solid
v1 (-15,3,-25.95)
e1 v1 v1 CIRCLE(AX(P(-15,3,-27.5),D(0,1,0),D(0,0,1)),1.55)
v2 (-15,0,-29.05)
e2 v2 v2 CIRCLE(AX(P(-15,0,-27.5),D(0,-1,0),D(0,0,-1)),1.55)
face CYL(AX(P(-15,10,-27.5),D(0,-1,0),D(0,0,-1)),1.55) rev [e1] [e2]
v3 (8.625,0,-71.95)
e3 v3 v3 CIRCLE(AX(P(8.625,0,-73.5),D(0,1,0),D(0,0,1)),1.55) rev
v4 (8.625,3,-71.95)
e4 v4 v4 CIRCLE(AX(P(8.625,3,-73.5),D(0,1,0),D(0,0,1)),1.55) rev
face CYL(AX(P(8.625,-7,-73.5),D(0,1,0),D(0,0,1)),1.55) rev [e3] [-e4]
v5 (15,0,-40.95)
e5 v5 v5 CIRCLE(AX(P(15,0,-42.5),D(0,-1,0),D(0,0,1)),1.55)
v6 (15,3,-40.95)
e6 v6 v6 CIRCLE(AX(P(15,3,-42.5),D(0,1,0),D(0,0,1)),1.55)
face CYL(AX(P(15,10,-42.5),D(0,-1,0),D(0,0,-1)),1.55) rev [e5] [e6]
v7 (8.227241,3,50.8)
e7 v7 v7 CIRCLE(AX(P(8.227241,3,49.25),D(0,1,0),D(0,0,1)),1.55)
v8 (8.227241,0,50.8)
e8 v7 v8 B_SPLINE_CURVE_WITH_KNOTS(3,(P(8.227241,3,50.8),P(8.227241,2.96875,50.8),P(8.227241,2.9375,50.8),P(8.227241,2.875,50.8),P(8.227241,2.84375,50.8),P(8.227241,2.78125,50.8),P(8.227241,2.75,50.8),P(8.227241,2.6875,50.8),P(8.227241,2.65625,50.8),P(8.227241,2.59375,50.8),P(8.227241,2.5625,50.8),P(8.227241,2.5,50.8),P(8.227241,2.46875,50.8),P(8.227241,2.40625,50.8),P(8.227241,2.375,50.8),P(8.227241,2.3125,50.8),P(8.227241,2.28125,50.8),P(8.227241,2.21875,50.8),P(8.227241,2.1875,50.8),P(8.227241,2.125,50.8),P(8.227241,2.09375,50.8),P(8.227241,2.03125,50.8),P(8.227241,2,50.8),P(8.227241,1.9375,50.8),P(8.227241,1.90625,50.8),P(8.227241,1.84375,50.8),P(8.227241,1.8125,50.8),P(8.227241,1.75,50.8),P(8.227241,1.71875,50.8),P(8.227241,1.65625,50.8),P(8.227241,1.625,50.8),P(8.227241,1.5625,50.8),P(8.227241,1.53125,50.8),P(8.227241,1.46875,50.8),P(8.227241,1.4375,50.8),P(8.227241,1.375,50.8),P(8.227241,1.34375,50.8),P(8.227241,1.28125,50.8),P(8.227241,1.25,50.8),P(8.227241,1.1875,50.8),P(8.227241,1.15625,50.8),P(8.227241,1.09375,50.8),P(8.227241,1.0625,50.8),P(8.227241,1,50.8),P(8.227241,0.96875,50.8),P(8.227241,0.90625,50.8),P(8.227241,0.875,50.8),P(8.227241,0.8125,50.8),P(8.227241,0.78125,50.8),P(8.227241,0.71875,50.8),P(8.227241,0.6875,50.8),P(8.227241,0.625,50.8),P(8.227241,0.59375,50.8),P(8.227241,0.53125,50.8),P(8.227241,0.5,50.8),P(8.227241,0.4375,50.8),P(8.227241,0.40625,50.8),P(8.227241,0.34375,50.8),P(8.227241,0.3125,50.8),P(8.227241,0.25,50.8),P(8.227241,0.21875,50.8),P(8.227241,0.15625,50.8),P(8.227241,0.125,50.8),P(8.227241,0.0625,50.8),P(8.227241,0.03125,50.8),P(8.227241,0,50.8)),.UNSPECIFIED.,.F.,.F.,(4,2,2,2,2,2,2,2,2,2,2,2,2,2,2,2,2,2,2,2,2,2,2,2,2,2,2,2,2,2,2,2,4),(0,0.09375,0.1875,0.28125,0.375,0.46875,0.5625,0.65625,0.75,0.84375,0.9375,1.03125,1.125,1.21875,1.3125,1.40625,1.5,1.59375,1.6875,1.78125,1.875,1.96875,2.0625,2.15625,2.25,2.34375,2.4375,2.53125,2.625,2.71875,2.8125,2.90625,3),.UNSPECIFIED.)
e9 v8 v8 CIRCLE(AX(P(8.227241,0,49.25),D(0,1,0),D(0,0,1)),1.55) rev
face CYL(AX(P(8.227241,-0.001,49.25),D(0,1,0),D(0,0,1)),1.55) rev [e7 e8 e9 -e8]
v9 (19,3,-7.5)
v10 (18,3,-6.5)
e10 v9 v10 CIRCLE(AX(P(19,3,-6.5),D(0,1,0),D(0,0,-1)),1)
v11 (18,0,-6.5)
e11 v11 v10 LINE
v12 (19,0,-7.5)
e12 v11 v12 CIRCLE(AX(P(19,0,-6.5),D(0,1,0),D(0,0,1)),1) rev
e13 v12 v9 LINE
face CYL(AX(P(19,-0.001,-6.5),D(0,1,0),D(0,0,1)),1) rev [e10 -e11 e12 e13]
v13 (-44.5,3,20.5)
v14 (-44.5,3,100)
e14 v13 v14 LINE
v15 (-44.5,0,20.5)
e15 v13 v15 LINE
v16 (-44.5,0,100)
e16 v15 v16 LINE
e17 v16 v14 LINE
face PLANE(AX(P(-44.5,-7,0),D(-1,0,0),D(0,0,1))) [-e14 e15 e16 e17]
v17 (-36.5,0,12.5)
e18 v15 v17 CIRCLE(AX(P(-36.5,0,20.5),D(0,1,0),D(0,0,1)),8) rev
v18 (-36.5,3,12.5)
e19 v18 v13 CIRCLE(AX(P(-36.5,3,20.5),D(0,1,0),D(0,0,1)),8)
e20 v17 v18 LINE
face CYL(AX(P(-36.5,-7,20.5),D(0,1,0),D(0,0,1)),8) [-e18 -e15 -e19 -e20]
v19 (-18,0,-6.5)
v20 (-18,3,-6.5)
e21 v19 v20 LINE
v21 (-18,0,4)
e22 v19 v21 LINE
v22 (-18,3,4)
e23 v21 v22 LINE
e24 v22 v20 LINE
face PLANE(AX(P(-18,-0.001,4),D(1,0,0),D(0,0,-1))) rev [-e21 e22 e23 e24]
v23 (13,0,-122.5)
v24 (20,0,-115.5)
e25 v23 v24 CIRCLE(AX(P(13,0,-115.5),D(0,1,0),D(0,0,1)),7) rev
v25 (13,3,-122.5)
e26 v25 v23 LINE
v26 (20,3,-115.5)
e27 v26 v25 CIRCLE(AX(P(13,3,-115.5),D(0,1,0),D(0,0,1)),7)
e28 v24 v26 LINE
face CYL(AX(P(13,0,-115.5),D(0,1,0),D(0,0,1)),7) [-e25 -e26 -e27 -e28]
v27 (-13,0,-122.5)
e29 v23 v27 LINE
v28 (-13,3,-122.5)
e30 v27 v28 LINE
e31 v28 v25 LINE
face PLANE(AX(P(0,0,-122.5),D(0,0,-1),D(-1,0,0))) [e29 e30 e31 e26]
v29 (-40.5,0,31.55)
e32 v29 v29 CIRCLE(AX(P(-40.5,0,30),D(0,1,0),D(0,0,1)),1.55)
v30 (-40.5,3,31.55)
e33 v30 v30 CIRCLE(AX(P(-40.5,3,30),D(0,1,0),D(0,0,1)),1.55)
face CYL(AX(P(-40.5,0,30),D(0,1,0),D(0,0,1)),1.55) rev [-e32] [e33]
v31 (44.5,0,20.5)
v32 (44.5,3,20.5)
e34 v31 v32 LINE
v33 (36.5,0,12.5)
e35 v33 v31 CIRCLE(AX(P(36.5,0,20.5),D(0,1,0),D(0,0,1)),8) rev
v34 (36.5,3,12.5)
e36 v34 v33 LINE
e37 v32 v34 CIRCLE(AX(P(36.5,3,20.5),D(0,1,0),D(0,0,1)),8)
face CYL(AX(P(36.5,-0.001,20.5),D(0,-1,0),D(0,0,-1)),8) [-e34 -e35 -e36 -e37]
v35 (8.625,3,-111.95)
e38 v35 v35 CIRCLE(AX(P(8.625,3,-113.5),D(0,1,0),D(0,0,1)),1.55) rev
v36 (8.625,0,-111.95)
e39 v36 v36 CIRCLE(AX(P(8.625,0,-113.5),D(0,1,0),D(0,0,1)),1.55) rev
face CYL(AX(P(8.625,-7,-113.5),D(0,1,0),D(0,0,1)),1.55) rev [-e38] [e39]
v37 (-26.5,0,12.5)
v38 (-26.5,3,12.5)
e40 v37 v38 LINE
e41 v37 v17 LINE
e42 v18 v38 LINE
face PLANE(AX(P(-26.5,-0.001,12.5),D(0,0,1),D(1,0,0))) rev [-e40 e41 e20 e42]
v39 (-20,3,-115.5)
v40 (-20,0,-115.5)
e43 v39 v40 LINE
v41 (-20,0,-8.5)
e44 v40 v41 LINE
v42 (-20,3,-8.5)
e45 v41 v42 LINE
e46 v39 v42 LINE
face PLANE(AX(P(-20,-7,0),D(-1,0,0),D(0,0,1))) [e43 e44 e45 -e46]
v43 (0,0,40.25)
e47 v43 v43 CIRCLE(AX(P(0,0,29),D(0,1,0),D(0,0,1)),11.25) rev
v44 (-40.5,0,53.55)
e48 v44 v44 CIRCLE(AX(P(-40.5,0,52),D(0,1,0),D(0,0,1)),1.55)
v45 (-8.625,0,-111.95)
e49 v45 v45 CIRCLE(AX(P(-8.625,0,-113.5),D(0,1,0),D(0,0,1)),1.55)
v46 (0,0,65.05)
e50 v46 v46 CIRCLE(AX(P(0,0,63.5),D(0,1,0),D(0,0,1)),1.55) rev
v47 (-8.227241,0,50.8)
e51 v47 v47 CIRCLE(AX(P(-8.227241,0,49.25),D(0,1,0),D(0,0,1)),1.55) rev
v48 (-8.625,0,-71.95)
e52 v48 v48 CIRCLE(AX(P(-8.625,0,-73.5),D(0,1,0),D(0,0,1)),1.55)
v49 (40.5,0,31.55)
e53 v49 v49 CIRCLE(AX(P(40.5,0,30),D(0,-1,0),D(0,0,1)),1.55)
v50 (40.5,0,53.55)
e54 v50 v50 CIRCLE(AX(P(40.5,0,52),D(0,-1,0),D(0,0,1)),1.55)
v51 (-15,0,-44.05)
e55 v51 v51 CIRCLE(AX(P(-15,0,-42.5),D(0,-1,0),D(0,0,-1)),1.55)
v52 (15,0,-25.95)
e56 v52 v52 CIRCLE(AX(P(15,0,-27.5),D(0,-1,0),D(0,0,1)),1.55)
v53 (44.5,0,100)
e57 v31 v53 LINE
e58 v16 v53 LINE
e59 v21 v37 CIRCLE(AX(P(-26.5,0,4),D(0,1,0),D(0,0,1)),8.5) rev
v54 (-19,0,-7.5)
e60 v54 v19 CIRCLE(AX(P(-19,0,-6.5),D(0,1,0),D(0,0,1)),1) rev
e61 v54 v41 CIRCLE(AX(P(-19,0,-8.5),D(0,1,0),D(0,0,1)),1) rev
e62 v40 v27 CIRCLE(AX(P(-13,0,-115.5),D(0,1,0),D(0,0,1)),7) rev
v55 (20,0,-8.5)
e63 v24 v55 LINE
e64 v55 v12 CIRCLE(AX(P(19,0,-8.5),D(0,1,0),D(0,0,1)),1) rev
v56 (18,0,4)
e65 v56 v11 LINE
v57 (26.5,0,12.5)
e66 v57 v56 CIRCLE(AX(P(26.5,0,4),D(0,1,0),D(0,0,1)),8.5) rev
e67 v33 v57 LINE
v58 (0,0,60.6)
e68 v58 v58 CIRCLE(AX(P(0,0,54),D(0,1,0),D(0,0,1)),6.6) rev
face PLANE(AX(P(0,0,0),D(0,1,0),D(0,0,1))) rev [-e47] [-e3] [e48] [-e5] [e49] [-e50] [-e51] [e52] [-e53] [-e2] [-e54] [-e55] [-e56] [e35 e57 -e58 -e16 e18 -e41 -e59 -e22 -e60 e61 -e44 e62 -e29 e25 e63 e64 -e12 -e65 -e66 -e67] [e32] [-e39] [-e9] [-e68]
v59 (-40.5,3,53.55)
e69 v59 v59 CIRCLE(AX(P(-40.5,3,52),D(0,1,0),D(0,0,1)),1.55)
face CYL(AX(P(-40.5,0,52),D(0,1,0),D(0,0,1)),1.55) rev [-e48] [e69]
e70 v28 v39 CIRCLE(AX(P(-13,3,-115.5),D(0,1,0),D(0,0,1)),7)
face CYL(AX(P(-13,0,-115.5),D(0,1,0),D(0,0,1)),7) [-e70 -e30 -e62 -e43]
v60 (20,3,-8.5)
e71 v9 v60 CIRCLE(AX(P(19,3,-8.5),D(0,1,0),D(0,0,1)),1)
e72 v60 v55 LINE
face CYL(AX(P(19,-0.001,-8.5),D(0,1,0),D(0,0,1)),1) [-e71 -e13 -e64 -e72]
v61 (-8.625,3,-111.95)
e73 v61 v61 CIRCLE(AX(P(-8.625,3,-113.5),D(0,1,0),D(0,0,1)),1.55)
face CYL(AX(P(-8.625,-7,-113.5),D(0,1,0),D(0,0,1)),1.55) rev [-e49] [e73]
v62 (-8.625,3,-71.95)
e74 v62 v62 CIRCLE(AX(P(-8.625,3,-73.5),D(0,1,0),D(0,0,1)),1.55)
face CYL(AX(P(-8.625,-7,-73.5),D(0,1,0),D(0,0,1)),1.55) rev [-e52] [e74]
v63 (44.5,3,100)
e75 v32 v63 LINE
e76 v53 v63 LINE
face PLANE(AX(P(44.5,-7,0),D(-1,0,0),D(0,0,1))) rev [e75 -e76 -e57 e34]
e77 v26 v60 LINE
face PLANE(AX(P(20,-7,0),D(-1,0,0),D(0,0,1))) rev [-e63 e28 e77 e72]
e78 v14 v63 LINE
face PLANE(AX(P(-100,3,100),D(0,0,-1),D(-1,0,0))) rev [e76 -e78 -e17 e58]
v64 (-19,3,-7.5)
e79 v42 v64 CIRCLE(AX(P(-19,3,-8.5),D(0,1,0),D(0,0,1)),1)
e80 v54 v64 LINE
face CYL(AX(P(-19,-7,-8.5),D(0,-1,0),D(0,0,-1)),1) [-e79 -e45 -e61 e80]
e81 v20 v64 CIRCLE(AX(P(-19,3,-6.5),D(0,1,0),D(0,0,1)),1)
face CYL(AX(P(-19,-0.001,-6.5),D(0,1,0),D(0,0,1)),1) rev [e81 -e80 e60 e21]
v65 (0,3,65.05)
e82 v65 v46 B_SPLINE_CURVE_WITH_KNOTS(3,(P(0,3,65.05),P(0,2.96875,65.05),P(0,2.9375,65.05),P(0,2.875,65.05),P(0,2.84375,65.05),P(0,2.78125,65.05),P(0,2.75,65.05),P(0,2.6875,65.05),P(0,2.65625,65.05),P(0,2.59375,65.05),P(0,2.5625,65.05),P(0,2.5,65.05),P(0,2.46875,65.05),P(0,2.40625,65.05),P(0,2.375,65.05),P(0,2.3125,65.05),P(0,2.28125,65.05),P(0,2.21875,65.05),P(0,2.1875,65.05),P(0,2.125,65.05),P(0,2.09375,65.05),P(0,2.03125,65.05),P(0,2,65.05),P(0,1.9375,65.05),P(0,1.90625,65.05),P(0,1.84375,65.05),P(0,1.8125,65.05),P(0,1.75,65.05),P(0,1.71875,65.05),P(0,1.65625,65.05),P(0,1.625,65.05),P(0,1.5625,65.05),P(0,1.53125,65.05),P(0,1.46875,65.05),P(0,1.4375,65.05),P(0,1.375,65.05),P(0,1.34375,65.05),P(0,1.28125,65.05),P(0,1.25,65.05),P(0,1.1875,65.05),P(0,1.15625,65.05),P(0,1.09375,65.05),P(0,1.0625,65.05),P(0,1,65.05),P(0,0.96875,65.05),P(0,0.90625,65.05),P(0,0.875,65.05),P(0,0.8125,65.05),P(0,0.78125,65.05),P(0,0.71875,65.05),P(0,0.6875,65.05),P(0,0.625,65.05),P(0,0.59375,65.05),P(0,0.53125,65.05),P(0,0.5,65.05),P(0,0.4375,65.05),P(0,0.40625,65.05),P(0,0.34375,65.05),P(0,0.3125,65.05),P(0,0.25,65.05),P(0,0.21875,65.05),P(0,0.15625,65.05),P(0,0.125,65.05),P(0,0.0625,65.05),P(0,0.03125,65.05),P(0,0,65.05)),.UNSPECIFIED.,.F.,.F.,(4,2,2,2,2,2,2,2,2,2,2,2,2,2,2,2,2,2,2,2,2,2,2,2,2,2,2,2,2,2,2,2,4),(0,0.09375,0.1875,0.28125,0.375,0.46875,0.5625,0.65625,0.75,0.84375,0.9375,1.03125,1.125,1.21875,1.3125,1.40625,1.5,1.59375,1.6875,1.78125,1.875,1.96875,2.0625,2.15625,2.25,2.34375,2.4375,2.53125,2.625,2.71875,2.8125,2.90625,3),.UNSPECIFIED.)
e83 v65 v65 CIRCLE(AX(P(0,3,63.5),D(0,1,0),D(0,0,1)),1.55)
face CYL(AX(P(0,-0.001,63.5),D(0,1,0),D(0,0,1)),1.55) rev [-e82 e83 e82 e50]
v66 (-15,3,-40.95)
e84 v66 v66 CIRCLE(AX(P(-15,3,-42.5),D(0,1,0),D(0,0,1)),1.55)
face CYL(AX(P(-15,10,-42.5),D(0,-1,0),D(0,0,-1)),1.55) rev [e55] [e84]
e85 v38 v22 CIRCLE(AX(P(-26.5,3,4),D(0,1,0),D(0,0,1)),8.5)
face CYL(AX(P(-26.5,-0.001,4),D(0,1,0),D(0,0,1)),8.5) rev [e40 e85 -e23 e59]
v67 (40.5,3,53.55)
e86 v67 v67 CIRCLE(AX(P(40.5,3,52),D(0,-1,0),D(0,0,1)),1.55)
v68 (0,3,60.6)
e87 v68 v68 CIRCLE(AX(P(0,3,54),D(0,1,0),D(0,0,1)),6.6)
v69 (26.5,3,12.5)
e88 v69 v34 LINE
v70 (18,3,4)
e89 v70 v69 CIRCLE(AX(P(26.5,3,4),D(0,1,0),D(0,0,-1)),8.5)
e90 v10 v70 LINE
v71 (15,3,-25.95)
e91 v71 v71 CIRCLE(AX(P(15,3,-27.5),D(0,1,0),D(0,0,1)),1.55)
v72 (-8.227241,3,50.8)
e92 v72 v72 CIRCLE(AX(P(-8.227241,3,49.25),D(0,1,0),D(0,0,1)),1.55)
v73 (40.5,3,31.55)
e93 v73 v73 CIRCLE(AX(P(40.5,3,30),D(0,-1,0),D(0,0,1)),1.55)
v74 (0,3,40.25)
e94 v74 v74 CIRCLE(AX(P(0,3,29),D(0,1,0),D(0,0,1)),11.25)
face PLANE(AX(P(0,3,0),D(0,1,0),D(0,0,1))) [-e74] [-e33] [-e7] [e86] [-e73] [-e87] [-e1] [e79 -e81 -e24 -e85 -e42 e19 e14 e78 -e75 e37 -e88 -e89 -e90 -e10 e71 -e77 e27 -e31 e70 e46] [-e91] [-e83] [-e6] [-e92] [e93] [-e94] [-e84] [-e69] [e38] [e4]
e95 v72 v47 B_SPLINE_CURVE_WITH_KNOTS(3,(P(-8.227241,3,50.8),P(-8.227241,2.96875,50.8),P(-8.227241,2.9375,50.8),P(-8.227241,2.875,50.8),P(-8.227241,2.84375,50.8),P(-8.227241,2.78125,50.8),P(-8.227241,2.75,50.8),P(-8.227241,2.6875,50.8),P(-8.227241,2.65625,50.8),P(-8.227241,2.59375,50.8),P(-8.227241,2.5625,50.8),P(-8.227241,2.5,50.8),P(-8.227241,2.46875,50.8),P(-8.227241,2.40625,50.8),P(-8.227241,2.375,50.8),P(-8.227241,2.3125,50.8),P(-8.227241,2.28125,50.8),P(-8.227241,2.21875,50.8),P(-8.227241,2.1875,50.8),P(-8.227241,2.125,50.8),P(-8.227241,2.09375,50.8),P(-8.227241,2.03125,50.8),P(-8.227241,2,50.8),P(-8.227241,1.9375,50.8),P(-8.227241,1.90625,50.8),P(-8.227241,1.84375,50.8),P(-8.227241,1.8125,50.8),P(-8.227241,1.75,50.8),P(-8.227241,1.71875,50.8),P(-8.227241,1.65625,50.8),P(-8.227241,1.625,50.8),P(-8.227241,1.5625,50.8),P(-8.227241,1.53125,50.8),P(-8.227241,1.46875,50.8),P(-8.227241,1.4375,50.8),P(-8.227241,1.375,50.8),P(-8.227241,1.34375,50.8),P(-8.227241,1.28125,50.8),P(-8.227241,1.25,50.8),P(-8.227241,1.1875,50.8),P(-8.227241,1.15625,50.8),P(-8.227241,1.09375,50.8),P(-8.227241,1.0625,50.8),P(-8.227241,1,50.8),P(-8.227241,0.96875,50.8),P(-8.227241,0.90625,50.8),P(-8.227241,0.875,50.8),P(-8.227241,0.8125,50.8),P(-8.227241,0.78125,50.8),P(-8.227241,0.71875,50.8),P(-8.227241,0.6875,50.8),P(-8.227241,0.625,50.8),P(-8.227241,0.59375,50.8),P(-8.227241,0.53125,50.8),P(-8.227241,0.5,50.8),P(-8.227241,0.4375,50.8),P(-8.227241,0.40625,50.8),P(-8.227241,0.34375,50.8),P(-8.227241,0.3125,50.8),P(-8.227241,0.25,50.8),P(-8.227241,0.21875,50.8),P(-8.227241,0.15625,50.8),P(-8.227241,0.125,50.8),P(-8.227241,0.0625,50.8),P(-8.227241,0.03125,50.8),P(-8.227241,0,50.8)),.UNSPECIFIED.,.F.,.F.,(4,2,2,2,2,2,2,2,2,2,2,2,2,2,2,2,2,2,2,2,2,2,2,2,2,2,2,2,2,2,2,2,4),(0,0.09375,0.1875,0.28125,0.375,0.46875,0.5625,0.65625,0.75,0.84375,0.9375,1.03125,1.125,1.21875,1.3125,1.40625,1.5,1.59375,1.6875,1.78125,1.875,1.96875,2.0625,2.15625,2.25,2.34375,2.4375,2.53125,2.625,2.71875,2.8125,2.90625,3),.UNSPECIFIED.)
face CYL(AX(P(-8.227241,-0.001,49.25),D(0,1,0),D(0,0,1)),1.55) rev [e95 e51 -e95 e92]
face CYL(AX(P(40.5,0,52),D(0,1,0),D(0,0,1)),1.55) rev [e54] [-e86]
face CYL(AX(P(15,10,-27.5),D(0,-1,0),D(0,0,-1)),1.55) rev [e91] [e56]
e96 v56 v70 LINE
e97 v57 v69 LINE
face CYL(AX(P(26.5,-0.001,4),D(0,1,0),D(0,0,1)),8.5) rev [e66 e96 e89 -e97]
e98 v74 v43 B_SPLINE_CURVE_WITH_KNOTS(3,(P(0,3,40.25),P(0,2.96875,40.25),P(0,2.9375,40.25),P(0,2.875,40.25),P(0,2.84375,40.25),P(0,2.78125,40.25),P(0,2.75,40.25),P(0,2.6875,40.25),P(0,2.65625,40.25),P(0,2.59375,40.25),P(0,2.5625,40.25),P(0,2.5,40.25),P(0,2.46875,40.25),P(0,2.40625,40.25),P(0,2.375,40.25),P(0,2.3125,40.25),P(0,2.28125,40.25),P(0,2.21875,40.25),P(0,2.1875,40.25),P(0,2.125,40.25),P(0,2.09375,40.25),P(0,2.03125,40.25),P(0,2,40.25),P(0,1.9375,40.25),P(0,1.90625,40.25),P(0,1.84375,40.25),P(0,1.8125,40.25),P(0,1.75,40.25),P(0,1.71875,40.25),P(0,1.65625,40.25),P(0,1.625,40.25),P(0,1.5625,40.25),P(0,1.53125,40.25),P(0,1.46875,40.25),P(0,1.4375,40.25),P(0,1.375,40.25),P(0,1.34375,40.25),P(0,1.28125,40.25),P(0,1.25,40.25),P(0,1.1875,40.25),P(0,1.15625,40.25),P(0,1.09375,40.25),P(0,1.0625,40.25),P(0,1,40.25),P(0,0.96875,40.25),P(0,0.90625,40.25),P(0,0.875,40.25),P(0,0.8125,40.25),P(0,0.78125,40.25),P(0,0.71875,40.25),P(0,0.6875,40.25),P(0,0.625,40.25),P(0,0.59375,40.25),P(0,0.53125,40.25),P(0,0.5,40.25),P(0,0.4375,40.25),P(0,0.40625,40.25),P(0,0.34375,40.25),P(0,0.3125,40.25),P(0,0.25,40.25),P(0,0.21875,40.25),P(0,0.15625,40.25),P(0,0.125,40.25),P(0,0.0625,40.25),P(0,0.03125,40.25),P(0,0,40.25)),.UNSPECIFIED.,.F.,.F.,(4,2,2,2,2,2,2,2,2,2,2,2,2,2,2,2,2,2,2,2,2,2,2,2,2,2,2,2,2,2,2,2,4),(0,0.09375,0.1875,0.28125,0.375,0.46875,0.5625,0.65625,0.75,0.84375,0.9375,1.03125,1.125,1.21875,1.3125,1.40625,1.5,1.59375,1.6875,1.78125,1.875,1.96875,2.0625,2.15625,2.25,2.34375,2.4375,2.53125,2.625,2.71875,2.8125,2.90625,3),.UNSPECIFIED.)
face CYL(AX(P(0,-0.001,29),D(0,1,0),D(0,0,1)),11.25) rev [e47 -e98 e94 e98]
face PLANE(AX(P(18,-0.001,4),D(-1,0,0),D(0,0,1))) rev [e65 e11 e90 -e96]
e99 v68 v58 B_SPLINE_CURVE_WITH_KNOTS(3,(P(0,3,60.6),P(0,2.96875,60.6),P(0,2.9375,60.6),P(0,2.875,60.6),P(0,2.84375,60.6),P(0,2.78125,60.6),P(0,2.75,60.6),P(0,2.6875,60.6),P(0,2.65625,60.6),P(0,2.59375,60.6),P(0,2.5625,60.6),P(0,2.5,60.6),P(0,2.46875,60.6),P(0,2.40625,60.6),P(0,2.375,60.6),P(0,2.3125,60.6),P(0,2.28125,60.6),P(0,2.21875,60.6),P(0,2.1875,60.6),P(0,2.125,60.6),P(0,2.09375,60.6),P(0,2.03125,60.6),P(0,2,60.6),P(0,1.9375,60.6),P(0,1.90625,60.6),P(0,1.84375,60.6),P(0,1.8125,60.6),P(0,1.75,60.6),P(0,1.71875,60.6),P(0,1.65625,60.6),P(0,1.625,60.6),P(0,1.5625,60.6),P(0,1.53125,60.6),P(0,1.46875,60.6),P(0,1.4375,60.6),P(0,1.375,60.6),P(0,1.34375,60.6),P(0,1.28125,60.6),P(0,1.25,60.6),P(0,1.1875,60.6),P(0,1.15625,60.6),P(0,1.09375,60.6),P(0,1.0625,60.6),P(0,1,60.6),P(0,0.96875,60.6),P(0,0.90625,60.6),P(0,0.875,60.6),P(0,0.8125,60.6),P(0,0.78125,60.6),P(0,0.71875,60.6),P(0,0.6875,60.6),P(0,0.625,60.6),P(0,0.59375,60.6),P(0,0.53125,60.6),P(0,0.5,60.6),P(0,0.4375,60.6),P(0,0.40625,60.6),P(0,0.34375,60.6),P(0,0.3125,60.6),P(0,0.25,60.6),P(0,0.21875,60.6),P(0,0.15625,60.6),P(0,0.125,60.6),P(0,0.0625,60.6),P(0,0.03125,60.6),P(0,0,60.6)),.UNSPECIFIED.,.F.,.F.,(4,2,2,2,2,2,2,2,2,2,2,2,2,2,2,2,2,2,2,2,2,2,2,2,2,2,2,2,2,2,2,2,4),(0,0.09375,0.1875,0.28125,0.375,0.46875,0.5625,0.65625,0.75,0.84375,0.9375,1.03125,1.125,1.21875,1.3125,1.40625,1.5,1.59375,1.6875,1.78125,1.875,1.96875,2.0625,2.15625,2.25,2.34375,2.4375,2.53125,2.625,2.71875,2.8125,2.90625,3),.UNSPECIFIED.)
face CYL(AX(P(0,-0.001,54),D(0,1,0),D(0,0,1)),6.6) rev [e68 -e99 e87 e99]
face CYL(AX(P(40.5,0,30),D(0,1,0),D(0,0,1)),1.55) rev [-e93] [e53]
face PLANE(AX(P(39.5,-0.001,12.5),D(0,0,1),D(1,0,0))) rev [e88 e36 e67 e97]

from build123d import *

# Parameters (mm, degrees)
SKETCH_1_W              = 200
SKETCH_1_H              = 200
EXTRUDE_1_DEPTH         = 3
SKETCH_2_R              = 1.5
CUT_EXTRUDE_2_DEPTH     = 10
CUT_EXTRUDE_3_DEPTH     = 10
SKETCH_6_R              = 1.55
CUT_EXTRUDE_3_1_1_DEPTH = 10
CUT_EXTRUDE_6_REACH     = 111.495
SKETCH_11_R             = 1.5
CUT_EXTRUDE_20_5_REACH  = 111.495
SKETCH_4_R              = 11.25
FILLET_1_R              = 1
SKETCH_12_W             = 40
SKETCH_12_H             = 3
EXTRUDE_2_DEPTH         = 75
FILLET_2_R              = 7
SKETCH_13_R             = 1.55
CUT_EXTRUDE_3_1_3_DEPTH = 10
CUT_EXTRUDE_2006_REACH  = 132.367
SKETCH_14_R             = 1.55
SKETCH_14_R_2           = 6.6
FILLET_3_R              = 8
SKETCH_17_R             = 1.55
CUT_EXTRUDE_7_DEPTH     = 131.36679025


with BuildPart() as part:
    # 草图1 → 凸台-拉伸1 (new body)
    with BuildSketch(Plane(origin=(0, 0, 0), x_dir=(1, 0, 0), z_dir=(0, 1, 0))):
        Rectangle(SKETCH_1_W, SKETCH_1_H)
    extrude(amount=EXTRUDE_1_DEPTH)

    # 草图2 → 切除-拉伸2 (cut)
    with BuildSketch(Plane(origin=(0, 3, 0), x_dir=(1, 0, 0), z_dir=(0, 1, 0))):
        with Locations(Location((29.5, 9.5, 0), (0, 0, 270))):
            Circle(SKETCH_2_R)
        with Locations(Location((21.5, 0, 0), (0, 0, 270))):
            Circle(SKETCH_2_R)
        with Locations(Location((29.5, -9.5, 0), (0, 0, 270))):
            Circle(SKETCH_2_R)
        with Locations(Location((37.5, 0, 0), (0, 0, 270))):
            Circle(SKETCH_2_R)
        with Locations(Location((-29.5, -9.5, 0), (0, 0, 270))):
            Circle(SKETCH_2_R)
        with Locations(Location((-37.5, 0, 0), (0, 0, 270))):
            Circle(SKETCH_2_R)
        with Locations(Location((-21.5, 0, 0), (0, 0, 270))):
            Circle(SKETCH_2_R)
        with Locations(Location((-29.5, 9.5, 0), (0, 0, 270))):
            Circle(SKETCH_2_R)
    extrude(amount=-CUT_EXTRUDE_2_DEPTH, mode=Mode.SUBTRACT)

    # 草图5 → 切除-拉伸3 (cut)
    with BuildSketch(Plane(origin=(0, 3, 0), x_dir=(1, 0, 0), z_dir=(0, 1, 0))):
        with BuildLine():
            Line((-100, -100), (-44.5, -100))
            Line((-44.5, -100), (-44.5, 0))
            ThreePointArc((-44.5, 0), (-40.212142643, 10.5), (-29.8, 14.9969997))
            ThreePointArc((-29.8, 14.9969997), (-22.858571571, 17.9949995), (-20, 24.9949995))
            Line((-20, 24.9949995), (-20, 47.5))
            Line((-20, 47.5), (0, 47.5))
            Line((0, 47.5), (20, 47.5))
            Line((20, 47.5), (20, 24.9949995))
            ThreePointArc((20, 24.9949995), (22.858571571, 17.9949995), (29.8, 14.9969997))
            ThreePointArc((29.8, 14.9969997), (40.212142643, 10.5), (44.5, 0))
            Line((44.5, 0), (44.5, -100))
            Line((44.5, -100), (100, -100))
            Line((100, -100), (100, 100))
            Line((100, 100), (-100, 100))
            Line((-100, 100), (-100, -100))
        make_face()
    extrude(amount=-CUT_EXTRUDE_3_DEPTH, mode=Mode.SUBTRACT)

    # 草图6 → φ3.1通孔1 (cut)
    with BuildSketch(Plane.XZ):
        with Locations(Location((-15, -42.5, 0), (0, 0, 270))):
            Circle(SKETCH_6_R)
        with Locations(Location((-15, -27.5, 0), (0, 0, 270))):
            Circle(SKETCH_6_R)
        with Locations(Location((15, -27.5, 0), (0, 0, 90))):
            Circle(SKETCH_6_R)
        with Locations(Location((15, -42.5, 0), (0, 0, 90))):
            Circle(SKETCH_6_R)
    extrude(amount=-CUT_EXTRUDE_3_1_1_DEPTH, mode=Mode.SUBTRACT)

    # 草图11 → 切除-拉伸6 (cut, up to next)
    with BuildSketch(Plane(origin=(0, 3, 0), x_dir=(1, 0, 0), z_dir=(0, 1, 0)), mode=Mode.PRIVATE) as cut_extrude_6_sk1:
        with BuildLine():
            Line((44.5, -17.5), (44.5, -100))
            Line((44.5, -100), (101.133062566, -100))
            Line((101.133062566, -100), (101.133062566, 47.5))
            Line((101.133062566, 47.5), (20, 47.5))
            Line((20, 47.5), (20, 7.5))
            Line((20, 7.5), (19, 7.5))
            ThreePointArc((19, 7.5), (18.292893219, 7.207106781), (18, 6.5))
            Line((18, 6.5), (18, -4))
            ThreePointArc((18, -4), (20.48959236, -10.01040764), (26.5, -12.5))
            Line((26.5, -12.5), (39.5, -12.5))
            Line((39.5, -12.5), (44.5, -12.5))
            Line((44.5, -12.5), (44.5, -17.5))
        make_face()
        with Locations((29.5, -9.5)):
            Circle(SKETCH_11_R, mode=Mode.SUBTRACT)
        with Locations((21.5, 0)):
            Circle(SKETCH_11_R, mode=Mode.SUBTRACT)
    cut_extrude_6_tool1 = extrude(cut_extrude_6_sk1.sketch, amount=-CUT_EXTRUDE_6_REACH, mode=Mode.PRIVATE) & part.part
    # 草图11 → 切除-拉伸6 (cut, up to next)
    with BuildSketch(Plane(origin=(0, 3, 0), x_dir=(1, 0, 0), z_dir=(0, 1, 0)), mode=Mode.PRIVATE) as cut_extrude_6_sk2:
        with BuildLine():
            Line((-44.5, -17.5), (-44.5, -100))
            Line((-44.5, -100), (-101.133062566, -100))
            Line((-101.133062566, -100), (-101.133062566, 47.5))
            Line((-101.133062566, 47.5), (-20, 47.5))
            Line((-20, 47.5), (-20, 7.5))
            Line((-20, 7.5), (-19, 7.5))
            ThreePointArc((-19, 7.5), (-18.292893219, 7.207106781), (-18, 6.5))
            Line((-18, 6.5), (-18, -4))
            ThreePointArc((-18, -4), (-20.48959236, -10.01040764), (-26.5, -12.5))
            Line((-26.5, -12.5), (-39.5, -12.5))
            Line((-39.5, -12.5), (-44.5, -12.5))
            Line((-44.5, -12.5), (-44.5, -17.5))
        make_face()
    cut_extrude_6_tool2 = extrude(cut_extrude_6_sk2.sketch, amount=-CUT_EXTRUDE_6_REACH, mode=Mode.PRIVATE) & part.part
    add(cut_extrude_6_tool1.solids().sort_by_distance((66.686037, 3, 19.669577))[0], mode=Mode.SUBTRACT)
    add(cut_extrude_6_tool2.solids().sort_by_distance((-66.626911, 3, 19.648158))[0], mode=Mode.SUBTRACT)

    # 草图4 → φ20.5落弹孔 (cut, up to next)
    with BuildSketch(Plane(origin=(0, 3, 0), x_dir=(1, 0, 0), z_dir=(0, 1, 0)), mode=Mode.PRIVATE) as cut_extrude_20_5_sk1:
        with Locations(Location((0, -29, 0), (0, 0, 270))):
            Circle(SKETCH_4_R)
    cut_extrude_20_5_tool1 = extrude(cut_extrude_20_5_sk1.sketch, amount=-CUT_EXTRUDE_20_5_REACH, mode=Mode.PRIVATE) & part.part
    add(cut_extrude_20_5_tool1.solids().sort_by_distance((0, 3, 29))[0], mode=Mode.SUBTRACT)

    # 圆角1
    fillet_1_edges = [part.edges().sort_by_distance(p)[0] for p in [
        (-20, 1.5, -7.5),
        (20, 1.5, -7.5),
    ]]
    fillet(fillet_1_edges, radius=FILLET_1_R - 0.0001)  # a hair under: the kernel refuses the full size

    # 草图12 → 凸台-拉伸2 (add)
    with BuildSketch(Plane(origin=(0, 0, -47.5), x_dir=(-1, 0, 0), z_dir=(0, 0, -1))):
        with Locations((0, 1.5)):
            Rectangle(SKETCH_12_W, SKETCH_12_H)
    extrude(amount=EXTRUDE_2_DEPTH)

    # 圆角2
    fillet_2_edges = [part.edges().sort_by_distance(p)[0] for p in [
        (20, 1.5, -122.5),
        (-20, 1.5, -122.5),
    ]]
    fillet(fillet_2_edges, radius=FILLET_2_R)

    # 草图13 → φ3.1通孔3 (cut)
    with BuildSketch(Plane(origin=(0, 3, 0), x_dir=(1, 0, 0), z_dir=(0, 1, 0))):
        with Locations(Location((-8.625, 113.5, 0), (0, 0, 270))):
            Circle(SKETCH_13_R)
        with Locations(Location((8.625, 113.5, 0), (0, 0, 270))):
            Circle(SKETCH_13_R)
        with Locations(Location((8.625, 73.5, 0), (0, 0, 270))):
            Circle(SKETCH_13_R)
        with Locations(Location((-8.625, 73.5, 0), (0, 0, 270))):
            Circle(SKETCH_13_R)
    extrude(amount=-CUT_EXTRUDE_3_1_3_DEPTH, mode=Mode.SUBTRACT)

    # 草图14 → 2006电机固定 (cut, up to next)
    with BuildSketch(Plane(origin=(0, 3, 0), x_dir=(1, 0, 0), z_dir=(0, 1, 0)), mode=Mode.PRIVATE) as cut_extrude_2006_sk1:
        with Locations(Location((0, -63.5, 0), (0, 0, 270))):
            Circle(SKETCH_14_R)
    cut_extrude_2006_tool1 = extrude(cut_extrude_2006_sk1.sketch, amount=-CUT_EXTRUDE_2006_REACH, mode=Mode.PRIVATE) & part.part
    # 草图14 → 2006电机固定 (cut, up to next)
    with BuildSketch(Plane(origin=(0, 3, 0), x_dir=(1, 0, 0), z_dir=(0, 1, 0)), mode=Mode.PRIVATE) as cut_extrude_2006_sk2:
        with Locations(Location((-8.227241336, -49.25, 0), (0, 0, 270))):
            Circle(SKETCH_14_R)
    cut_extrude_2006_tool2 = extrude(cut_extrude_2006_sk2.sketch, amount=-CUT_EXTRUDE_2006_REACH, mode=Mode.PRIVATE) & part.part
    # 草图14 → 2006电机固定 (cut, up to next)
    with BuildSketch(Plane(origin=(0, 3, 0), x_dir=(1, 0, 0), z_dir=(0, 1, 0)), mode=Mode.PRIVATE) as cut_extrude_2006_sk3:
        with Locations(Location((8.227241336, -49.25, 0), (0, 0, 270))):
            Circle(SKETCH_14_R)
    cut_extrude_2006_tool3 = extrude(cut_extrude_2006_sk3.sketch, amount=-CUT_EXTRUDE_2006_REACH, mode=Mode.PRIVATE) & part.part
    # 草图14 → 2006电机固定 (cut, up to next)
    with BuildSketch(Plane(origin=(0, 3, 0), x_dir=(1, 0, 0), z_dir=(0, 1, 0)), mode=Mode.PRIVATE) as cut_extrude_2006_sk4:
        with Locations(Location((0, -54, 0), (0, 0, 270))):
            Circle(SKETCH_14_R_2)
    cut_extrude_2006_tool4 = extrude(cut_extrude_2006_sk4.sketch, amount=-CUT_EXTRUDE_2006_REACH, mode=Mode.PRIVATE) & part.part
    add(cut_extrude_2006_tool1.solids().sort_by_distance((0, 3, 63.5))[0], mode=Mode.SUBTRACT)
    add(cut_extrude_2006_tool2.solids().sort_by_distance((-8.227241, 3, 49.25))[0], mode=Mode.SUBTRACT)
    add(cut_extrude_2006_tool3.solids().sort_by_distance((8.227241, 3, 49.25))[0], mode=Mode.SUBTRACT)
    add(cut_extrude_2006_tool4.solids().sort_by_distance((0, 3, 54))[0], mode=Mode.SUBTRACT)

    # 圆角3
    fillet_3_edges = [part.edges().sort_by_distance(p)[0] for p in [
        (44.5, 1.5, 12.5),
        (-44.5, 1.5, 12.5),
    ]]
    fillet(fillet_3_edges, radius=FILLET_3_R)

    # 草图17 → 切除-拉伸7 (cut, through all)
    with BuildSketch(Plane(origin=(0, 3, 0), x_dir=(1, 0, 0), z_dir=(0, 1, 0))):
        with Locations(Location((-40.5, -30, 0), (0, 0, 270))):
            Circle(SKETCH_17_R)
        with Locations(Location((-40.5, -52, 0), (0, 0, 270))):
            Circle(SKETCH_17_R)
    cut_extrude_7 = extrude(amount=-CUT_EXTRUDE_7_DEPTH, mode=Mode.SUBTRACT)

    # 镜向1: 切除-拉伸7 across plane
    add(cut_extrude_7.mirror(Plane(origin=(0, 0, 0), x_dir=(0, 0, 1), z_dir=(1, 0, 0))), mode=Mode.SUBTRACT)


solid = part.part
